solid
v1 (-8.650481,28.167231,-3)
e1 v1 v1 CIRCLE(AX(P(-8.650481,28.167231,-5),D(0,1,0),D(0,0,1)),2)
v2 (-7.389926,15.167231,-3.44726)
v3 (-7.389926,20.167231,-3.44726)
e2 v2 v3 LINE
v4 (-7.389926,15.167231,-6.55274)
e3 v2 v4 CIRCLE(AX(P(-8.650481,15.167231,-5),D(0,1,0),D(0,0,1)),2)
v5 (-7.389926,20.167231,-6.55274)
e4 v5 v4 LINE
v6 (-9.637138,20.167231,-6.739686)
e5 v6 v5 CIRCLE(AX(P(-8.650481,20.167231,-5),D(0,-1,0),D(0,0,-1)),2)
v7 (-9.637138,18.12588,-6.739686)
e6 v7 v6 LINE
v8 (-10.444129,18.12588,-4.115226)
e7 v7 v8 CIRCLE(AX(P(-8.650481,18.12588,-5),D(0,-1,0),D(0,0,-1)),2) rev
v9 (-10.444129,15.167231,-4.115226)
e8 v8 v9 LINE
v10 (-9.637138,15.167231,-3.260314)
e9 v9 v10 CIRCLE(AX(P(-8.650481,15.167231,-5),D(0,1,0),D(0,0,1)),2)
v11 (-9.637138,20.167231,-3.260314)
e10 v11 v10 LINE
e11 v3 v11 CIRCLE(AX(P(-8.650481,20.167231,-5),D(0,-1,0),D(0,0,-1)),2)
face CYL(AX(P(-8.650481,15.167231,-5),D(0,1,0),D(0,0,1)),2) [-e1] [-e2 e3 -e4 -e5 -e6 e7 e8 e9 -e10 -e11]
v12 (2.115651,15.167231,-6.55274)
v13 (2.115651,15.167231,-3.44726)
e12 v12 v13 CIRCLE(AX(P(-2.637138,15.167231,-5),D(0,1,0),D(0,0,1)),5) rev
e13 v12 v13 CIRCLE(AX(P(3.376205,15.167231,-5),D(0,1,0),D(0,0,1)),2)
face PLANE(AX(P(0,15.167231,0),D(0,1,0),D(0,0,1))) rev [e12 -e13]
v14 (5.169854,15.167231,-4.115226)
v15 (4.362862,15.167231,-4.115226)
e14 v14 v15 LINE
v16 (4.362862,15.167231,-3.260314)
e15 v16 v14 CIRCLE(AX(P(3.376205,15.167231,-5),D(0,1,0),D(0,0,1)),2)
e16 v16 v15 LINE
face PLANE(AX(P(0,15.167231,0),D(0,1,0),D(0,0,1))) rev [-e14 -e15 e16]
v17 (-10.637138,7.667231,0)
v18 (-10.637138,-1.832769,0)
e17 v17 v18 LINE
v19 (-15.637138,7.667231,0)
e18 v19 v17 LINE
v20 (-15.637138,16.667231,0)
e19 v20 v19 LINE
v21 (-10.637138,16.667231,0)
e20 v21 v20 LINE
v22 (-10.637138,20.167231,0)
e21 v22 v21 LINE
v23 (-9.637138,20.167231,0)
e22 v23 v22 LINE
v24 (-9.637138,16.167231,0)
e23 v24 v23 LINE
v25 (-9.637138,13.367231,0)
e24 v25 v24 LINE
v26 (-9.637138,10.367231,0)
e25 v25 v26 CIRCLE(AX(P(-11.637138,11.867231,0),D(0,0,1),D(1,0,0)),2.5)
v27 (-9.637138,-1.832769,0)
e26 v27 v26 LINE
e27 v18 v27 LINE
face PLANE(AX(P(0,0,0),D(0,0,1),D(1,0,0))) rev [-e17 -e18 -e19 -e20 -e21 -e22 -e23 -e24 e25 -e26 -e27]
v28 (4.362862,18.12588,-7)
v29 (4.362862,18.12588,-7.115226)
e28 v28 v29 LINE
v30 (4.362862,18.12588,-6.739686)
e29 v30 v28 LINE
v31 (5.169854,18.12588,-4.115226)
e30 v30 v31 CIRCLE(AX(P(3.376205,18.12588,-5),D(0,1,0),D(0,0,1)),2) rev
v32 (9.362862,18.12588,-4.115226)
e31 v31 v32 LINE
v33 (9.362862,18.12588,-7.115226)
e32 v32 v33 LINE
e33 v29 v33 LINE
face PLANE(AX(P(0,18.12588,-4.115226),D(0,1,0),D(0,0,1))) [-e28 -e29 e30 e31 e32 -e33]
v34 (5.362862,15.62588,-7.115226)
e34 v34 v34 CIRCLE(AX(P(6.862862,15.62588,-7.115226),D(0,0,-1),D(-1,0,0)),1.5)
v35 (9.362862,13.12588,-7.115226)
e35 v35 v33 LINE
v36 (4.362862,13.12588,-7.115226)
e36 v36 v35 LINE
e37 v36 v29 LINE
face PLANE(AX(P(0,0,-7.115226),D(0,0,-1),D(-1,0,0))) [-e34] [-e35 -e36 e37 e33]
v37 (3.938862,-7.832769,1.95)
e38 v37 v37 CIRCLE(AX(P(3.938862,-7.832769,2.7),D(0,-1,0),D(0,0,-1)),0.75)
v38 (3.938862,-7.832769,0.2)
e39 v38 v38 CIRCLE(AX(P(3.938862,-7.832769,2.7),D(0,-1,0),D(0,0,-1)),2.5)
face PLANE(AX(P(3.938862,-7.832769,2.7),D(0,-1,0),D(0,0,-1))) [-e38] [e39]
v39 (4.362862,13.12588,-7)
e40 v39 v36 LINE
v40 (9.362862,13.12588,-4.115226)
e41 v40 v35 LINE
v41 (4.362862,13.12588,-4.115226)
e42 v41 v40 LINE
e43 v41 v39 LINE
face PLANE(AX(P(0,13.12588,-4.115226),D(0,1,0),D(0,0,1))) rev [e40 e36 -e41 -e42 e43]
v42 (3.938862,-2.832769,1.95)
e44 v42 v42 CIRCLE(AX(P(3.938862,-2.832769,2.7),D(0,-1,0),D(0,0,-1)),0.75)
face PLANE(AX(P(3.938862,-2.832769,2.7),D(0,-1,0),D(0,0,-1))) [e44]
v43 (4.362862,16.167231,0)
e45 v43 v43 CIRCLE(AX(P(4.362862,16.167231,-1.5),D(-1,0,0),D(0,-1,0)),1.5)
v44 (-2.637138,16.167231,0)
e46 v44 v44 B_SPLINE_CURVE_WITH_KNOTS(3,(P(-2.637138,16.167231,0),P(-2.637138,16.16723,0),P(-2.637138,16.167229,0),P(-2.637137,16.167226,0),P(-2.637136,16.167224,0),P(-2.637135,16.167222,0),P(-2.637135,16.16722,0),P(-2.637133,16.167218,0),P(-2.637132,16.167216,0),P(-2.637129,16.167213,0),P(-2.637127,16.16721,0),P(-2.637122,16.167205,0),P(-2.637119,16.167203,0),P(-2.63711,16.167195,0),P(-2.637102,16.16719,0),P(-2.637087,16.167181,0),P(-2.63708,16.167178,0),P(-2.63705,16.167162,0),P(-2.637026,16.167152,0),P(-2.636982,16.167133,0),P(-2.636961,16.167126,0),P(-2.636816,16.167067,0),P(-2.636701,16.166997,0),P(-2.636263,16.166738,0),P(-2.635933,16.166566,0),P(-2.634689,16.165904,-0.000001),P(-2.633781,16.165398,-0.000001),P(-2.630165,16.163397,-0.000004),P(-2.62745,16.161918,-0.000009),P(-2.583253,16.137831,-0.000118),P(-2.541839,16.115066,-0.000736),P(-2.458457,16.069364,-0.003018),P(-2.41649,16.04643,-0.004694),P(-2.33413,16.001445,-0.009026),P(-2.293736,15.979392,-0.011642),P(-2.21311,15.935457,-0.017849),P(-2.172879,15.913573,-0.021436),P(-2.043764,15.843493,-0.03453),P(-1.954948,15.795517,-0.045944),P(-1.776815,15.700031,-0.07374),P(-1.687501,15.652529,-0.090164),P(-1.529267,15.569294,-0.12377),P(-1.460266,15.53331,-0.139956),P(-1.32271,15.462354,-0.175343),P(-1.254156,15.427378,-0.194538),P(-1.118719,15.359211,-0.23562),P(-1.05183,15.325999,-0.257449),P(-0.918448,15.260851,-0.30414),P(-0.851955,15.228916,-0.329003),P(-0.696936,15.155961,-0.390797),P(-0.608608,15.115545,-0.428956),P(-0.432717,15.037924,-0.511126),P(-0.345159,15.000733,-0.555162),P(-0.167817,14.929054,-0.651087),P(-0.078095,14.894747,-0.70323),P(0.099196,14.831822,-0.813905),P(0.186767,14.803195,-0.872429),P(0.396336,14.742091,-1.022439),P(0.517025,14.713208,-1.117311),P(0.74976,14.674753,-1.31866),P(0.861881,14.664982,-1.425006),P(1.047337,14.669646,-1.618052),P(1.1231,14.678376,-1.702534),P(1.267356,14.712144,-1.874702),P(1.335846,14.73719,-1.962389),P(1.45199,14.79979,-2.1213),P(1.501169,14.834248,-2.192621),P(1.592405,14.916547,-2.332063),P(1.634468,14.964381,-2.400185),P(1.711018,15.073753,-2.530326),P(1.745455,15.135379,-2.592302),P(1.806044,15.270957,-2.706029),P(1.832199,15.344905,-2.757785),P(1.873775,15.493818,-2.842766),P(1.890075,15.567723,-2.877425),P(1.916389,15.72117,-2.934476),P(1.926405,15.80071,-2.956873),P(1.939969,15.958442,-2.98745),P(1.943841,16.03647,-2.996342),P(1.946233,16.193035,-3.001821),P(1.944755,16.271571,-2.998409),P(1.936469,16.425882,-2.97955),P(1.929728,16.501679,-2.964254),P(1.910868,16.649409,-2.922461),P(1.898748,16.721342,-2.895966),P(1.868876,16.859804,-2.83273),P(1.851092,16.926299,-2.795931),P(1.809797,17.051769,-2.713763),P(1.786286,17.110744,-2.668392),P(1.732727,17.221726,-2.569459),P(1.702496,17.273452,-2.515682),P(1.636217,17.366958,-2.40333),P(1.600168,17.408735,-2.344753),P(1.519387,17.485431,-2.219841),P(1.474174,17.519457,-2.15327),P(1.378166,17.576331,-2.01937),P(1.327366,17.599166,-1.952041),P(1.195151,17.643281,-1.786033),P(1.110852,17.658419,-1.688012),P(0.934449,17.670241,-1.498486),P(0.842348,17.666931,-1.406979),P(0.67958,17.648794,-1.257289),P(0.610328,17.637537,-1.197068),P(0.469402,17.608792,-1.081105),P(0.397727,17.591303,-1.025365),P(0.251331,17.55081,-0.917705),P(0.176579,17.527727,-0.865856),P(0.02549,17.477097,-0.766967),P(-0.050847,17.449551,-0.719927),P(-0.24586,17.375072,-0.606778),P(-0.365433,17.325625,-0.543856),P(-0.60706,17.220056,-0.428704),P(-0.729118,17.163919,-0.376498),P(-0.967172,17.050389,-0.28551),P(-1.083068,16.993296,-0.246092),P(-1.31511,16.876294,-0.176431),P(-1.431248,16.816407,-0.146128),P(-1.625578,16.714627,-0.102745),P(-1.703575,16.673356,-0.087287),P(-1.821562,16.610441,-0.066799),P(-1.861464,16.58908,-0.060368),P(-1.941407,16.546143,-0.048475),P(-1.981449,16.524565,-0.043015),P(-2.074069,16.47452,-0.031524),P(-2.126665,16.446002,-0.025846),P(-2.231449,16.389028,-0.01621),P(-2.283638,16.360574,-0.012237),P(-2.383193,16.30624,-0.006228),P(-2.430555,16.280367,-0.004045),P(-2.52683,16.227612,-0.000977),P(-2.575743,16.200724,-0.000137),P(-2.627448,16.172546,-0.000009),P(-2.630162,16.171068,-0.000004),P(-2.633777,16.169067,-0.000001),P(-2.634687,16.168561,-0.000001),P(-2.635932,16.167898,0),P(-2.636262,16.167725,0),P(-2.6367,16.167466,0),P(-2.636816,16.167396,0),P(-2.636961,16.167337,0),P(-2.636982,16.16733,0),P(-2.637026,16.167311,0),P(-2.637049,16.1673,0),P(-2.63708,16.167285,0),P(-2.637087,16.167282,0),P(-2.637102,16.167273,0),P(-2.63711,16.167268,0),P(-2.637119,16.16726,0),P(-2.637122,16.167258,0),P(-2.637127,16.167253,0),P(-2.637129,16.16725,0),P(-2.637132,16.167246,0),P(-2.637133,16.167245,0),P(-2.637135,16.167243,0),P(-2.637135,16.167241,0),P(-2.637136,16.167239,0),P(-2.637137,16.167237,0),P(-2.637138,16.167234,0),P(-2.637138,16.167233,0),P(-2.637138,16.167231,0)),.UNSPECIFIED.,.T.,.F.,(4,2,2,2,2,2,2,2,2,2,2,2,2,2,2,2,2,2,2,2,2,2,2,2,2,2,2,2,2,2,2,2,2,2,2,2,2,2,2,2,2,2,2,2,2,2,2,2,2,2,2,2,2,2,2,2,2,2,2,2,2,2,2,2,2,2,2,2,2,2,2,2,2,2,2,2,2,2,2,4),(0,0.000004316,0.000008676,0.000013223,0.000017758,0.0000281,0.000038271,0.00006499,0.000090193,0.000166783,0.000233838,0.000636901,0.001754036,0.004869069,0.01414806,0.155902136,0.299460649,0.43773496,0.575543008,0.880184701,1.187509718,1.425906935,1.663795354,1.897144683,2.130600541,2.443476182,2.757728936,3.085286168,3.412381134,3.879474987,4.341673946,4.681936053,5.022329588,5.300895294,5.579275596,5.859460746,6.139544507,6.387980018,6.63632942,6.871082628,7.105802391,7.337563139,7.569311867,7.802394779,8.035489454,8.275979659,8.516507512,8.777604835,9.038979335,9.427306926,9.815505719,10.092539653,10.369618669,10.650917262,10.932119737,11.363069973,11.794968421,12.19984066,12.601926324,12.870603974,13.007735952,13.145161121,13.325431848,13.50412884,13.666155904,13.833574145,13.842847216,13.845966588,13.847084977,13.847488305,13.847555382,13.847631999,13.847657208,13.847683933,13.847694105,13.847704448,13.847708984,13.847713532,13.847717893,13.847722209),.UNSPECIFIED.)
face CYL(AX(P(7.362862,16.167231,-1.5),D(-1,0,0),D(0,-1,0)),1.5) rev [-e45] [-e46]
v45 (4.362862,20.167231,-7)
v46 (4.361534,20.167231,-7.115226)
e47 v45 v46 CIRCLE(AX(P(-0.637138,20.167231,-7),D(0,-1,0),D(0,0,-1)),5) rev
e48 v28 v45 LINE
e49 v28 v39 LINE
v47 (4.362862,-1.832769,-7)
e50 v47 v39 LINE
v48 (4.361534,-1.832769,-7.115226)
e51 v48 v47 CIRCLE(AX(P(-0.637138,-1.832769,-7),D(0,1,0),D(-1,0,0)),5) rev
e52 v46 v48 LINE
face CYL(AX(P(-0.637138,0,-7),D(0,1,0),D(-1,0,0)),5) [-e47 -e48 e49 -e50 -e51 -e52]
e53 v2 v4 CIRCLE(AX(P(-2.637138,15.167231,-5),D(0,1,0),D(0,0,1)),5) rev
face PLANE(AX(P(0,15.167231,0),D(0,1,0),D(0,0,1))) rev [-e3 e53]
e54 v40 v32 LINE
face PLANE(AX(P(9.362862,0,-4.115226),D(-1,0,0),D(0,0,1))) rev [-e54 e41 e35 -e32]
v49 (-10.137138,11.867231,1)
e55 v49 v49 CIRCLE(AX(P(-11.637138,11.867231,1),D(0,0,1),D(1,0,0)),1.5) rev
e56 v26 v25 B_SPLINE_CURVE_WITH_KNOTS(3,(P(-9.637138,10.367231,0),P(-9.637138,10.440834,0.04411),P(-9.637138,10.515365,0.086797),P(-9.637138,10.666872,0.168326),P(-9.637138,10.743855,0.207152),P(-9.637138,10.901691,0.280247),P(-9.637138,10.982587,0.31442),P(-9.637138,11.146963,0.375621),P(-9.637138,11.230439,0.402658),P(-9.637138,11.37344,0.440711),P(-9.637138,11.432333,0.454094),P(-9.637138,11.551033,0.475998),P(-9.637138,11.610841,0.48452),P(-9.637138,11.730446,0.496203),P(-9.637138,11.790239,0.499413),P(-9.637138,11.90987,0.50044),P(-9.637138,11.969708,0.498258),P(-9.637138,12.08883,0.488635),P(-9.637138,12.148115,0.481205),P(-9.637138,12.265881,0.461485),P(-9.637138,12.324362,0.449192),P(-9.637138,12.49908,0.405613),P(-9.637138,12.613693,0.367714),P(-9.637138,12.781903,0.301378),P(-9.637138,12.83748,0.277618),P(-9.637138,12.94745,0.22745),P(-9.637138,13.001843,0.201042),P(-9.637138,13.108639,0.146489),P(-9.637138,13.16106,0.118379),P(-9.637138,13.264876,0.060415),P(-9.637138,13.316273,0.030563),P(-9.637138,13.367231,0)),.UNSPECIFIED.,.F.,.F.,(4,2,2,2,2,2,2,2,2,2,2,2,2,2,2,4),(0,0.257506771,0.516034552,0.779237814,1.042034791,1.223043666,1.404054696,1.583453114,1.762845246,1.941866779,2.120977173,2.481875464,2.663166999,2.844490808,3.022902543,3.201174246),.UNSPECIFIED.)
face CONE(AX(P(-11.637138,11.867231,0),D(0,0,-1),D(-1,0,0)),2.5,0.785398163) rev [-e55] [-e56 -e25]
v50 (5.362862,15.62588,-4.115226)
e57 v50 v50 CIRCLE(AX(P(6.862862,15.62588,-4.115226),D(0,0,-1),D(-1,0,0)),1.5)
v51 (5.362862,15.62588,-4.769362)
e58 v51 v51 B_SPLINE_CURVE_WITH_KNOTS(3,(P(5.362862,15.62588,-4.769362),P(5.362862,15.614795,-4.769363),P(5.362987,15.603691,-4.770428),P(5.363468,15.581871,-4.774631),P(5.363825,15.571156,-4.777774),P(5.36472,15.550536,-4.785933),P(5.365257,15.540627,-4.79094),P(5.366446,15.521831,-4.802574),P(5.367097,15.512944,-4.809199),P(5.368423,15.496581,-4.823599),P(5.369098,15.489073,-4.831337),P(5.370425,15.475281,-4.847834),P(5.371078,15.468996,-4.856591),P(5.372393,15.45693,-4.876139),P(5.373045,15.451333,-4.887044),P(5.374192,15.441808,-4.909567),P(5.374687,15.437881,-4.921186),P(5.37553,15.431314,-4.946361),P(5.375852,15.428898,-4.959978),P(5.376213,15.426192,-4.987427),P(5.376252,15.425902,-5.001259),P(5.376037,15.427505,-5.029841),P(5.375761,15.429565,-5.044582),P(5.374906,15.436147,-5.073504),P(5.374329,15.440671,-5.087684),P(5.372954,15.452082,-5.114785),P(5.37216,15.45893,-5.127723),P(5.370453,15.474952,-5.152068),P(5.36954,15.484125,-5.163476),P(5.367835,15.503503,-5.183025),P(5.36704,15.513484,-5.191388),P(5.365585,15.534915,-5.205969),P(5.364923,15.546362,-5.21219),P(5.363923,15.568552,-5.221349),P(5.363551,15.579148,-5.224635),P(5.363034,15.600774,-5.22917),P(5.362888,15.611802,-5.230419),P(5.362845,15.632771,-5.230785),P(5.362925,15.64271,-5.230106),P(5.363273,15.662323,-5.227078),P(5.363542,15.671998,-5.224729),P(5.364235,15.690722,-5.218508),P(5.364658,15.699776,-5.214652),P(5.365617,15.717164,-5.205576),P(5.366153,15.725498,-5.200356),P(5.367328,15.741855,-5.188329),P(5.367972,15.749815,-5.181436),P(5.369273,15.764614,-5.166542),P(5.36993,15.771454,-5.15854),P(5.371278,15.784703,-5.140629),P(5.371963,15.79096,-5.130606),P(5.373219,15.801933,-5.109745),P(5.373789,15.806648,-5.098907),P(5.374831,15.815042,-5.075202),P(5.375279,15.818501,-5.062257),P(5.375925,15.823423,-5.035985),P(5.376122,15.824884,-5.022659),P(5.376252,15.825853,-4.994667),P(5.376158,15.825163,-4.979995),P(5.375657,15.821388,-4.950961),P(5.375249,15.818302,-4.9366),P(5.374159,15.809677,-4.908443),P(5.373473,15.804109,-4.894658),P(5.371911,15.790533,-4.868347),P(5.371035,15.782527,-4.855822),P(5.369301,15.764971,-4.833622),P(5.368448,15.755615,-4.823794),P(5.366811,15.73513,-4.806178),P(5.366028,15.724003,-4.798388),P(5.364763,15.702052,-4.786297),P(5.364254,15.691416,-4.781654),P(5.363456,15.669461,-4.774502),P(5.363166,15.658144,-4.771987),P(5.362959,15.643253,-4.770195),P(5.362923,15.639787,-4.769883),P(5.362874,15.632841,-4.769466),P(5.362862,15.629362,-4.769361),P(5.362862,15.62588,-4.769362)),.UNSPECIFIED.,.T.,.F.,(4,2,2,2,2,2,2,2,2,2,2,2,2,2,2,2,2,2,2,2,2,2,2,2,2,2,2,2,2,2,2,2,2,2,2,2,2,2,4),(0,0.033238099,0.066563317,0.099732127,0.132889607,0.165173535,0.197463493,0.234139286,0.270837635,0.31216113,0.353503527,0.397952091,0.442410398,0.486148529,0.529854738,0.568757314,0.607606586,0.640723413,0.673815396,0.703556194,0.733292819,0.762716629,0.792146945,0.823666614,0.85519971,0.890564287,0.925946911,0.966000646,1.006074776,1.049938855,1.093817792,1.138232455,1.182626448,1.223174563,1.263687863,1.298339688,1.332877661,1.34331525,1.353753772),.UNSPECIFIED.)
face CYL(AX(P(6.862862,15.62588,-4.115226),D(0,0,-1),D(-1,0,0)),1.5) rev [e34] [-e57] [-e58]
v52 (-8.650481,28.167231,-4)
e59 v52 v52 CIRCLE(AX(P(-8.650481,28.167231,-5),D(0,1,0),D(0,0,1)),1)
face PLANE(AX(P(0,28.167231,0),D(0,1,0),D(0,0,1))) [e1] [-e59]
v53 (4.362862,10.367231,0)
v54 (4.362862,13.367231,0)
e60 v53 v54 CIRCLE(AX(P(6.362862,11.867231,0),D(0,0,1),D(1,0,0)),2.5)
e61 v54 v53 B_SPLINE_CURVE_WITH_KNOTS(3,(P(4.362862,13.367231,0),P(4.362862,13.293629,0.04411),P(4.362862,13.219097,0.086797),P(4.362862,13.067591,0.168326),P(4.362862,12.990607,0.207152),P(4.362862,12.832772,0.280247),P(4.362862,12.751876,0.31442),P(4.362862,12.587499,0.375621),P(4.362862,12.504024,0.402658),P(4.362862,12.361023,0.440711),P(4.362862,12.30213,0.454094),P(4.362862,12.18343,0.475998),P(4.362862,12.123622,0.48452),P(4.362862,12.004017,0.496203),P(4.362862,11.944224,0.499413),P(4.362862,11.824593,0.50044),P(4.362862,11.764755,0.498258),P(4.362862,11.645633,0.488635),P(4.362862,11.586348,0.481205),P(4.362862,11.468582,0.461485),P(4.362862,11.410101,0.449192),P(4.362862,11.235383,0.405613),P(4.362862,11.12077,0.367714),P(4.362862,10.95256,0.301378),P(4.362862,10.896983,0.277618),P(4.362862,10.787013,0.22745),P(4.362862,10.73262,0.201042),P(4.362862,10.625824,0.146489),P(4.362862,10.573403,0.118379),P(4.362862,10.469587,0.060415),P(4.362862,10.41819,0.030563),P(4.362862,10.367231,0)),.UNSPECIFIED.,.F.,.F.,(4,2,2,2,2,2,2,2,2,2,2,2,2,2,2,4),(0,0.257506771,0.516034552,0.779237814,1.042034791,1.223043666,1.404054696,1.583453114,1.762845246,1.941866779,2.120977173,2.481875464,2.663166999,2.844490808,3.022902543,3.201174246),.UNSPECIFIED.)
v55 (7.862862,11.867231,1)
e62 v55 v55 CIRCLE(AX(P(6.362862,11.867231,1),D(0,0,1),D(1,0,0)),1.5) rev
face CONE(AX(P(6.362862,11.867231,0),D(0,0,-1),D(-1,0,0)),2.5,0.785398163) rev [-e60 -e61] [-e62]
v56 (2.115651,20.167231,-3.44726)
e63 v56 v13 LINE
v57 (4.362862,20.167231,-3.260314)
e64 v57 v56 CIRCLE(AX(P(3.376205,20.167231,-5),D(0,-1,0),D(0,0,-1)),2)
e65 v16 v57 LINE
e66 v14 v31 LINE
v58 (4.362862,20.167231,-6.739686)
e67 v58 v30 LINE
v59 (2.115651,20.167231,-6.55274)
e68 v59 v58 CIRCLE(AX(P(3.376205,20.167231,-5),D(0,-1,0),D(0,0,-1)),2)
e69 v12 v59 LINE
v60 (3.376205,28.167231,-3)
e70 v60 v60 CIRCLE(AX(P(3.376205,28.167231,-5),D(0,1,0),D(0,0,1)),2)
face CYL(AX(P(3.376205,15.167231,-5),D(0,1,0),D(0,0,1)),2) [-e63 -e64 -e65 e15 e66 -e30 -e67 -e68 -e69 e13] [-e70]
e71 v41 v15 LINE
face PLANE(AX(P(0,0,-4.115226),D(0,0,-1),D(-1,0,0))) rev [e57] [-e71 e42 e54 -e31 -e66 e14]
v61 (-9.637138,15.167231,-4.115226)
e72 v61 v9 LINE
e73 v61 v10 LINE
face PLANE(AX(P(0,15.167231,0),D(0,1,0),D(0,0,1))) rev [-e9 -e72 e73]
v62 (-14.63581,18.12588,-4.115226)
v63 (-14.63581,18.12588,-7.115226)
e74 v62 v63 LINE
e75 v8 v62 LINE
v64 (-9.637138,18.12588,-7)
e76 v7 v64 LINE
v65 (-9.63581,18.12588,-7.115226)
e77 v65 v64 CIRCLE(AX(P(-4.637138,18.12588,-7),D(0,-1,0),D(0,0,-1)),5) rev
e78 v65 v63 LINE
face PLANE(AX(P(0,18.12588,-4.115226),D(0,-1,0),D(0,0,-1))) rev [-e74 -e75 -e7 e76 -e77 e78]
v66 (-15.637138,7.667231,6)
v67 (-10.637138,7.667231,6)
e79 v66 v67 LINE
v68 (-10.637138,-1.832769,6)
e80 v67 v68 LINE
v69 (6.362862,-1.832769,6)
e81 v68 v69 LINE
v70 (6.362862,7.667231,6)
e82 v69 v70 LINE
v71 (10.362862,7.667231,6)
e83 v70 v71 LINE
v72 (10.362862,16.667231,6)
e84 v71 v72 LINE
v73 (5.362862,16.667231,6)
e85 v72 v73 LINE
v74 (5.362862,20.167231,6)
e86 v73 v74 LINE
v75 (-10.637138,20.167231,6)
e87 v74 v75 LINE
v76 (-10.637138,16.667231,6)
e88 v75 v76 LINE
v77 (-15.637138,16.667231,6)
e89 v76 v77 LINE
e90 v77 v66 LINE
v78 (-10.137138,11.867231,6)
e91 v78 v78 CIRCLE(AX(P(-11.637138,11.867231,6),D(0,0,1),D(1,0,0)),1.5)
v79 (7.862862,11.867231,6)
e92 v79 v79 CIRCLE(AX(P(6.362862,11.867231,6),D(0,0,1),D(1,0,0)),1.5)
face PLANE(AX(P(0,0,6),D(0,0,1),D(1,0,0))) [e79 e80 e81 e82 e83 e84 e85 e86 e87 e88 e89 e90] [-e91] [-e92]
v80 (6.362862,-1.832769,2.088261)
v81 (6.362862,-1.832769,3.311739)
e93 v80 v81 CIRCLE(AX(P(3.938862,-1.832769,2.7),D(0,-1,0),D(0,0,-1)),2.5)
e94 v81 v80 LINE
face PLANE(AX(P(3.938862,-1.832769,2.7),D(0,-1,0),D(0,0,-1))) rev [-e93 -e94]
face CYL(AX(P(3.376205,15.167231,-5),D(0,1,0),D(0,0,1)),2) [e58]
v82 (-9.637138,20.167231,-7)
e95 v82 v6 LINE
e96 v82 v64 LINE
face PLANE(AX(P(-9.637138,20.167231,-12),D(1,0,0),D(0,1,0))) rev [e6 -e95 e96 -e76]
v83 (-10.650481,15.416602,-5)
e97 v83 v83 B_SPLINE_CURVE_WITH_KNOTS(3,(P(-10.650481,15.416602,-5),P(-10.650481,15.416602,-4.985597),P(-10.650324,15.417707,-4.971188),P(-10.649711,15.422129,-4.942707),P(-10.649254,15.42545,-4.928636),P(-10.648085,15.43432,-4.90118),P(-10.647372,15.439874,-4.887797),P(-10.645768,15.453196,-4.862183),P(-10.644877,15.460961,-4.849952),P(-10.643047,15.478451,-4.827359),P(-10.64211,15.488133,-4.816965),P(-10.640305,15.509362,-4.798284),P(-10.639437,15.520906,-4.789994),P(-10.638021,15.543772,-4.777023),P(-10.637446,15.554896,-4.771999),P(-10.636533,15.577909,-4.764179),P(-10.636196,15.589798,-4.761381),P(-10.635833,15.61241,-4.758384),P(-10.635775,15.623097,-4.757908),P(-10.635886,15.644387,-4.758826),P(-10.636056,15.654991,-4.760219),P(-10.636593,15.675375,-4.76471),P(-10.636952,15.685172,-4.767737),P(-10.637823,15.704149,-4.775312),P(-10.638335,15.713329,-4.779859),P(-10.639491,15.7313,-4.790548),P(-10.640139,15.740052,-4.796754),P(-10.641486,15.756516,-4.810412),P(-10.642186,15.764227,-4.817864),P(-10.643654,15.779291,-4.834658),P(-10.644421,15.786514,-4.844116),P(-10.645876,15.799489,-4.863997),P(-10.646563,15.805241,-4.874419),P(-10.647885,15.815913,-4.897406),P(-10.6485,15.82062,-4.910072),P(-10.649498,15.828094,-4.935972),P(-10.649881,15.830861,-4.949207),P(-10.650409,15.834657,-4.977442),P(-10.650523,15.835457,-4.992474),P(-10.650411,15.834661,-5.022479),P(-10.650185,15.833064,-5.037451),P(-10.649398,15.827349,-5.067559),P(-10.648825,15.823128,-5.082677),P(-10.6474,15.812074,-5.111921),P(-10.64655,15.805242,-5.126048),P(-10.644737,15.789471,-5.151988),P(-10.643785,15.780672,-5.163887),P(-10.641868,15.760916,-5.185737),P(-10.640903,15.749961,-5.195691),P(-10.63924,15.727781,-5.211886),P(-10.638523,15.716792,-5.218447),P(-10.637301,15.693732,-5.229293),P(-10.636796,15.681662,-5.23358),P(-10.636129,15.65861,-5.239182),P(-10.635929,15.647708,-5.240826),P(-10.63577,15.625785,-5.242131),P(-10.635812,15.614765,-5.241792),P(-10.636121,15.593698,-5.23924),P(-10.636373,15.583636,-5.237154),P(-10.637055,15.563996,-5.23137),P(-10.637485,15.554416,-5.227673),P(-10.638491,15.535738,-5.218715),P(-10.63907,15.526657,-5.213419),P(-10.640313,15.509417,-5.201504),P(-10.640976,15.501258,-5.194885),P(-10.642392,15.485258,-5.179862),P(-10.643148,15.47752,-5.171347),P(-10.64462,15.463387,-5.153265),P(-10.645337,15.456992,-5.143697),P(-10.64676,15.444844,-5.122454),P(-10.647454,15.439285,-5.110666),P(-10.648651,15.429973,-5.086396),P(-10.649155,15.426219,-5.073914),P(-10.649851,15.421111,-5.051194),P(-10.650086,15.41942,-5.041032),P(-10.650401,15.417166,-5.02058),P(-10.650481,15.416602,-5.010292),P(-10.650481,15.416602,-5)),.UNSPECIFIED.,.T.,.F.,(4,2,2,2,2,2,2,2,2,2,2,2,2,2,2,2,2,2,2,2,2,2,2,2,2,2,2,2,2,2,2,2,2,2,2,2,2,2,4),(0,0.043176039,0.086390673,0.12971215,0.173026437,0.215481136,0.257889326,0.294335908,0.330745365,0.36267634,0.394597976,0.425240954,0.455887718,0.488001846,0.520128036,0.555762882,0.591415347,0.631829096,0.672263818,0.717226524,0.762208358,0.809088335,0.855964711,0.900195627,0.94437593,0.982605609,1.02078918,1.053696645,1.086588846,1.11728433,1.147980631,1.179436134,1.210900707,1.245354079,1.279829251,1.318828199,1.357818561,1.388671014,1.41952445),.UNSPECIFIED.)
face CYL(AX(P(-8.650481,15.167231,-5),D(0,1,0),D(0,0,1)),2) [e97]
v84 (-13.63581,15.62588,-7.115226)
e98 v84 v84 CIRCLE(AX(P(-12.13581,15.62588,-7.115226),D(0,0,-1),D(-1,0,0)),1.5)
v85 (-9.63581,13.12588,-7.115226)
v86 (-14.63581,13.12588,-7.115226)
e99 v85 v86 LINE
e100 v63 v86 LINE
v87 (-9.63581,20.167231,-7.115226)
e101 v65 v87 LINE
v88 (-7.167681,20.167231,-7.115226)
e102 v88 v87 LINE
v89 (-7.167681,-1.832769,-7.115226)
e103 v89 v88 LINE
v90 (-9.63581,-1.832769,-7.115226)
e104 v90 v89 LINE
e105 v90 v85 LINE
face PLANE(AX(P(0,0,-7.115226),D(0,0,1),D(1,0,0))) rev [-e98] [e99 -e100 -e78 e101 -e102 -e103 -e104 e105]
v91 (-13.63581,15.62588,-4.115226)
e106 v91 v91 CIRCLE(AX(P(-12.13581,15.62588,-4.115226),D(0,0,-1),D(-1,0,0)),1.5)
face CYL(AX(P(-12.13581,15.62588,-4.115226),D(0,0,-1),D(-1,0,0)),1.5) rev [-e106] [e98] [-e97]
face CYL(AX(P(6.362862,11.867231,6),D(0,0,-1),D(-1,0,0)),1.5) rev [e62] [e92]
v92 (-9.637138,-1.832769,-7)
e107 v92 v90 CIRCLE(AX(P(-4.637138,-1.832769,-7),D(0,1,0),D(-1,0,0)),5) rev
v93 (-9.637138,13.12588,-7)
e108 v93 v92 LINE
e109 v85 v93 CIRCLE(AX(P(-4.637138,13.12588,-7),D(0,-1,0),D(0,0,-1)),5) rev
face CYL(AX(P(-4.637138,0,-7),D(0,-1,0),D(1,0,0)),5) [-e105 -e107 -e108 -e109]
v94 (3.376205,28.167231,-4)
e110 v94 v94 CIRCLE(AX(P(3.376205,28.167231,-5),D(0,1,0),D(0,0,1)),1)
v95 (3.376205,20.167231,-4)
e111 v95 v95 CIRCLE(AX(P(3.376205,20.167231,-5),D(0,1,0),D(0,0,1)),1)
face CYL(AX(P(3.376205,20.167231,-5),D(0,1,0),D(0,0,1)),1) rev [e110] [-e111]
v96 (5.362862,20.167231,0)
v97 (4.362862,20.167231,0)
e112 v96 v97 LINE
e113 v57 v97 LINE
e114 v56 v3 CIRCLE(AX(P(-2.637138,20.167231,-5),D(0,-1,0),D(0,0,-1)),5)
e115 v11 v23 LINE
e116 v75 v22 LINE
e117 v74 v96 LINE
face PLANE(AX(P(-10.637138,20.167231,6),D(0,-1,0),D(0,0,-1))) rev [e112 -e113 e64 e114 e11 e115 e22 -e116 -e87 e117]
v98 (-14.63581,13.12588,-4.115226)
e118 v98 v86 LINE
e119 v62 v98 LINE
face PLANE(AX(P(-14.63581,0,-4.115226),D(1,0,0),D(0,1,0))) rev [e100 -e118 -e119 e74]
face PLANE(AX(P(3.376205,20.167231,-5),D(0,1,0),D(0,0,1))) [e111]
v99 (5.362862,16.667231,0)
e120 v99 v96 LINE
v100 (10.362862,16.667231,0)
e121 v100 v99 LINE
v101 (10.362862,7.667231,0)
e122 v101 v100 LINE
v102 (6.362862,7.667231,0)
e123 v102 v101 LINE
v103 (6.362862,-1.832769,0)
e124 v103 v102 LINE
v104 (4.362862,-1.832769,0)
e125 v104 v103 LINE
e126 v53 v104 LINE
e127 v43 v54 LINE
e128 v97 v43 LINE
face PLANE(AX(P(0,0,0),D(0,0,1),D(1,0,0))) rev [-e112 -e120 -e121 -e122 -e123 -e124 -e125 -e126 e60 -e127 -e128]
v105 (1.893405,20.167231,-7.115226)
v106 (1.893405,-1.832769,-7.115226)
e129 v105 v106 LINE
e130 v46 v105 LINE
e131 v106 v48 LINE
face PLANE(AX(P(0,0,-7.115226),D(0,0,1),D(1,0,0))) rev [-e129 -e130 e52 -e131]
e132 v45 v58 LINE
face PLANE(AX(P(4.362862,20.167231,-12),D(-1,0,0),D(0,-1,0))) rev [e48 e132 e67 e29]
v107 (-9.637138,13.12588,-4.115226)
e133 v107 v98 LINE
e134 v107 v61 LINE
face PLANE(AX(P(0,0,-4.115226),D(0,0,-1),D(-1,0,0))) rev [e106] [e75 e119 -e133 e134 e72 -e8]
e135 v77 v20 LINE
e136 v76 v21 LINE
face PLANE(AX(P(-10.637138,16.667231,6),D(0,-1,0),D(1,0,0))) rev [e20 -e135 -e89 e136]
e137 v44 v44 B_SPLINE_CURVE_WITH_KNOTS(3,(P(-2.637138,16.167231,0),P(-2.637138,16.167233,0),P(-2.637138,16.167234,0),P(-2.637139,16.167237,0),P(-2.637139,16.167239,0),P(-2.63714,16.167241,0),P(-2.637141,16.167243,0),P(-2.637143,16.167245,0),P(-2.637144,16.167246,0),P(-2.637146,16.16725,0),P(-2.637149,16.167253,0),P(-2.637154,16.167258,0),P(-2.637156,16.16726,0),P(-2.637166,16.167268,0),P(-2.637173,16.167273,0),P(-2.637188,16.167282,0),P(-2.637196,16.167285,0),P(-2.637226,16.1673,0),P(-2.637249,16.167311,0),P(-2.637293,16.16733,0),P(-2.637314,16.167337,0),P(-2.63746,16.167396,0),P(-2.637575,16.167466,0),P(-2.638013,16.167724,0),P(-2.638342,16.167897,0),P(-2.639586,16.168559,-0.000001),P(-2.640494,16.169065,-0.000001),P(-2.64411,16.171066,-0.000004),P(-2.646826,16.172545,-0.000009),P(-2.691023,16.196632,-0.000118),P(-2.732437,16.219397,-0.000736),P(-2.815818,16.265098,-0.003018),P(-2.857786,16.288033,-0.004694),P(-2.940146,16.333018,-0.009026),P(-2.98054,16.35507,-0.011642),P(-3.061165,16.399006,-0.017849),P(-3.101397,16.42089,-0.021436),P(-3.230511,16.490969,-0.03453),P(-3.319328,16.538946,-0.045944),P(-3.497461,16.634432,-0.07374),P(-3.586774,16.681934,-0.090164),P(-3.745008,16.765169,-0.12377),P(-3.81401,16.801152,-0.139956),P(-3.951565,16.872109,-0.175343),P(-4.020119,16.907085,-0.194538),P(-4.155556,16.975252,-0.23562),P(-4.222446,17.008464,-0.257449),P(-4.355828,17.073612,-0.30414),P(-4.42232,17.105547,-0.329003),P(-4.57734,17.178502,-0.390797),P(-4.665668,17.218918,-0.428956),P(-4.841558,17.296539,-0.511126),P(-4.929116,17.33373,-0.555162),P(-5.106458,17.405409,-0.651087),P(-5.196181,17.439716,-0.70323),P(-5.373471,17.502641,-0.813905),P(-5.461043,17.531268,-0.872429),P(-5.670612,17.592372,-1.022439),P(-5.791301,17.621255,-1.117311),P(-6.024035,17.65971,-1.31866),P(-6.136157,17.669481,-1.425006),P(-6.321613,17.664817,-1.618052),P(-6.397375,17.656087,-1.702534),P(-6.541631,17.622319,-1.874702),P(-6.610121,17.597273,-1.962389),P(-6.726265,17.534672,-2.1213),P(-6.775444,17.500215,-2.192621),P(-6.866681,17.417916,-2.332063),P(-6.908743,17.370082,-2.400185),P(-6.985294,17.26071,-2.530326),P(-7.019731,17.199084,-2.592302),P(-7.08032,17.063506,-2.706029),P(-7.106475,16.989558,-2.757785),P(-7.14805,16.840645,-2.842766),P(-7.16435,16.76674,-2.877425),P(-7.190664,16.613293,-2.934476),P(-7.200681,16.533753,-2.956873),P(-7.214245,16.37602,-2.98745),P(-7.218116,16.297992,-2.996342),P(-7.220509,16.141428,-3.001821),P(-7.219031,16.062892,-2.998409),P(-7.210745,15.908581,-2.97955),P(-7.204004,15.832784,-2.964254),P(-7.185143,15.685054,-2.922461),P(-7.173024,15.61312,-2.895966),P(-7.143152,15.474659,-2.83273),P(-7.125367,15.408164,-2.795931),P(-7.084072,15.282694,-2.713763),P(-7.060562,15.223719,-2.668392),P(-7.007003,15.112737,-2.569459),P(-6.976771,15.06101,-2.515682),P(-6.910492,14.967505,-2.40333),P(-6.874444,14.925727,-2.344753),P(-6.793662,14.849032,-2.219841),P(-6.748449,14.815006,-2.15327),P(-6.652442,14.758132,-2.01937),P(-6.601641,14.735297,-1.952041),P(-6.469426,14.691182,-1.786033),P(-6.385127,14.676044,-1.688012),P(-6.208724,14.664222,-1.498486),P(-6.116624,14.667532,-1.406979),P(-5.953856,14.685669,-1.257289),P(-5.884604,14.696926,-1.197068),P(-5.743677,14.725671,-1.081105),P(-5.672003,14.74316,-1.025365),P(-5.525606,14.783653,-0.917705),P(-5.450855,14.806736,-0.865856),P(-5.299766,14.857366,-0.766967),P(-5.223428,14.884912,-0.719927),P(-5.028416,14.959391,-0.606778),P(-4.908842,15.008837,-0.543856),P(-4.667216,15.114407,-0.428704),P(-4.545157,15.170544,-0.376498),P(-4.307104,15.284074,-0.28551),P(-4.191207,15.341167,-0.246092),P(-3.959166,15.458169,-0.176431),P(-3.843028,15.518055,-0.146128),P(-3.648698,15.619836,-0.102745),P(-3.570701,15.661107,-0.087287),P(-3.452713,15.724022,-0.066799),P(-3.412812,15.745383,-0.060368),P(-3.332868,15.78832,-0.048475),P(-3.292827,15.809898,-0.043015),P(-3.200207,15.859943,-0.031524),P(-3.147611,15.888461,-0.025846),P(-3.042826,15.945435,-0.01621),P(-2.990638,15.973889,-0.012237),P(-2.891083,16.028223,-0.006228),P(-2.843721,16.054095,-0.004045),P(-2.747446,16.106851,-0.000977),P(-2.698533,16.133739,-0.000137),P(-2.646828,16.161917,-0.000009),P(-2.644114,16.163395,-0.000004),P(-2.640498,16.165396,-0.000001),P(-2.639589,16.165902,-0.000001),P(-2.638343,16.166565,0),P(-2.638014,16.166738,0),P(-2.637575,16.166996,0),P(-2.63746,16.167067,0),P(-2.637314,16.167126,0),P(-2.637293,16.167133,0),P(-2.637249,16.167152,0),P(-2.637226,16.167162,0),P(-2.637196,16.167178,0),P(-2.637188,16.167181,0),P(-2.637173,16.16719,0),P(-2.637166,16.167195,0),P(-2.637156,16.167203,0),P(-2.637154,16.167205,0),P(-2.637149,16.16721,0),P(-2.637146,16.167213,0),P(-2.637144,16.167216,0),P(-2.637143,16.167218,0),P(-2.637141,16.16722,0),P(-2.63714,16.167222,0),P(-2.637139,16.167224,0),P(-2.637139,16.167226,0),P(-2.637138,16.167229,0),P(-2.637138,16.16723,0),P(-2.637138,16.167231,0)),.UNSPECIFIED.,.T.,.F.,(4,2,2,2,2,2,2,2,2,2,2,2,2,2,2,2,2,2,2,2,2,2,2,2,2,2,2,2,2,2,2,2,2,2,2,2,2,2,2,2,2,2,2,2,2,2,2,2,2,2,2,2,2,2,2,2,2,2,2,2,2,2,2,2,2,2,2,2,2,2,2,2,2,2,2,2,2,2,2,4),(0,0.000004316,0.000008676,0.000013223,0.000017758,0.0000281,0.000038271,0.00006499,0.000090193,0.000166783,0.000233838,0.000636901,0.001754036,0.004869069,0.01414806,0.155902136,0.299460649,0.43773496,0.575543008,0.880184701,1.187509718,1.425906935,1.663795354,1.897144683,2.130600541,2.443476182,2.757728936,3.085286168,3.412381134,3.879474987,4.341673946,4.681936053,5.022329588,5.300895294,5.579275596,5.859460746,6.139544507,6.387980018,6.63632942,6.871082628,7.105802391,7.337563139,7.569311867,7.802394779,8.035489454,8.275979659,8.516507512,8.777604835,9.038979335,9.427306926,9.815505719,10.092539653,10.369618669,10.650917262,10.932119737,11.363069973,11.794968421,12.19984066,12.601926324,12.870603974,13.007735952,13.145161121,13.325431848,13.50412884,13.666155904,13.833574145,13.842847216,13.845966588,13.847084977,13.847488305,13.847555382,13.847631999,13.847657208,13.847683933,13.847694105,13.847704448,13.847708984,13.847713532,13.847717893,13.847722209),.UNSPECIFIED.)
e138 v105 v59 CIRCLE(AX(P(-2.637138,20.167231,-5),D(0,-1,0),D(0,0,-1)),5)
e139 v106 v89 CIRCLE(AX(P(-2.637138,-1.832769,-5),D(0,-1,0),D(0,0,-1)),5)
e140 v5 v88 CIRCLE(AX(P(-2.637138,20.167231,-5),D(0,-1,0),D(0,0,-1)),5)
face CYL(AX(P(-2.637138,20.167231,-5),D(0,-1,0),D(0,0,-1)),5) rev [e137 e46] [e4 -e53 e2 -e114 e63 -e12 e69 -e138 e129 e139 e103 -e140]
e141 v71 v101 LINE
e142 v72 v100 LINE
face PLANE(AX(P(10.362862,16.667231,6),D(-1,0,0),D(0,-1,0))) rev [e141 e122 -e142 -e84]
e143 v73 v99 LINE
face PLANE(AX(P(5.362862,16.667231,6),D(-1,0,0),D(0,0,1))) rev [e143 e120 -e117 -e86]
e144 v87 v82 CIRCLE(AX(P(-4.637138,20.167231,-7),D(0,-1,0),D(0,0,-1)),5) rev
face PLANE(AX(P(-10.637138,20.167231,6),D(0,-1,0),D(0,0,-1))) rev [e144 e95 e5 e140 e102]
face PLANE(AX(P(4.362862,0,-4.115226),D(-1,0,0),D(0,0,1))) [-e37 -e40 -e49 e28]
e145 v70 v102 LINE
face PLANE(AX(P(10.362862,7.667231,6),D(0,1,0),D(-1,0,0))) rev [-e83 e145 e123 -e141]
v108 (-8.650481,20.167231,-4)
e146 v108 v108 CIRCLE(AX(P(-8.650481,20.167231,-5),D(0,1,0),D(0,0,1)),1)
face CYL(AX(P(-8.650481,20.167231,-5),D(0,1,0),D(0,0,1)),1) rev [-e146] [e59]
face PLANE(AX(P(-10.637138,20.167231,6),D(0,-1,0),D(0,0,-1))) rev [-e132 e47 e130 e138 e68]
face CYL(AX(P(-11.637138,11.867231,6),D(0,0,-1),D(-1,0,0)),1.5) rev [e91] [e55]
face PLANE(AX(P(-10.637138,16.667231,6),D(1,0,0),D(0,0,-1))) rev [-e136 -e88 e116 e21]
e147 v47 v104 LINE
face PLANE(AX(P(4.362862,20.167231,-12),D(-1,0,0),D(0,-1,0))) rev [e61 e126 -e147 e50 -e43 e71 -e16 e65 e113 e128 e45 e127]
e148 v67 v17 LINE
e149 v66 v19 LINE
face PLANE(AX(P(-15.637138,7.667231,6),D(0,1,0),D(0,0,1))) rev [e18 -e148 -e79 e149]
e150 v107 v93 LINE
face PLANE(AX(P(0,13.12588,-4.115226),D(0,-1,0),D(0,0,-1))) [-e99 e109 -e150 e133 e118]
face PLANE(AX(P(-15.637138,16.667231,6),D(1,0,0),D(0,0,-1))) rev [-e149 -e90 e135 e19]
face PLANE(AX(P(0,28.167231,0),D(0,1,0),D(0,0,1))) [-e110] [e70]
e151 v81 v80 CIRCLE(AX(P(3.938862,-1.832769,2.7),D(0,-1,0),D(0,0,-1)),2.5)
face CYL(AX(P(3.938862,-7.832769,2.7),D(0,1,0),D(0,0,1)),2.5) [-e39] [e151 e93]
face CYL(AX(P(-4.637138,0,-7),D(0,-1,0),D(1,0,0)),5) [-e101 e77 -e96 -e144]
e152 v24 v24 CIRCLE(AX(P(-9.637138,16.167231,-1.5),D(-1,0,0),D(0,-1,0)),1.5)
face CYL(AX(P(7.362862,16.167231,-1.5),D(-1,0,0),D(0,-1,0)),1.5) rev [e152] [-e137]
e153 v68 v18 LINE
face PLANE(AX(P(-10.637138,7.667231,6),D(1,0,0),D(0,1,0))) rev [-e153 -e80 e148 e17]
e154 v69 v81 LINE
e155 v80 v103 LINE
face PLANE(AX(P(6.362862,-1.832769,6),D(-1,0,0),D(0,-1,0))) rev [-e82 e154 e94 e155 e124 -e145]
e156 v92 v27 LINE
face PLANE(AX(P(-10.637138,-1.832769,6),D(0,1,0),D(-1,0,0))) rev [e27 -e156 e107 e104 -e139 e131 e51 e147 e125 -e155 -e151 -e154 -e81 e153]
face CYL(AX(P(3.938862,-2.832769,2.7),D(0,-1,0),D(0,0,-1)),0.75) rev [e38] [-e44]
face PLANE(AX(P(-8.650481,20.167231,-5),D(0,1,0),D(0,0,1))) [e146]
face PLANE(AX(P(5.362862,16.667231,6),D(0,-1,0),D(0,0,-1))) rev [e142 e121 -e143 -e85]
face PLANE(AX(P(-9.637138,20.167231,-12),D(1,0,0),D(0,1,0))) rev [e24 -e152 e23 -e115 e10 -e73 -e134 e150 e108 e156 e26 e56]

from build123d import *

# Parameters (mm, degrees)
ESBO_O1_R                      = 1.5
RESSALTO_EXTRUS_O1_DEPTH       = 6
ESBO_O6_W                      = 14
ESBO_O6_H                      = 22
RESSALTO_EXTRUS_O3_DEPTH       = 12
ESBO_O7_R                      = 5
CORTE_EXTRUS_O4_DEPTH          = 30.538450843
FILETE3_R                      = 5
ESBO_O11_R                     = 2.5
RESSALTO_EXTRUS_O11_DEPTH      = 6
RESSALTO_EXTRUS_O13_DEPTH      = 8
RESSALTO_EXTRUS_O13_DEPTH_BACK = 5
ESBO_O15_R                     = 2
ESBO_O17_R                     = 1
CORTE_EXTRUS_O6_DEPTH          = 8
ESBO_O20_R                     = 0.75
CORTE_EXTRUS_O7_DEPTH          = 5
ESBO_O21_W                     = 22.669500521
ESBO_O21_H                     = 31.157259519
CORTE_EXTRUS_O8_DEPTH          = 6
ESBO_O22_W                     = 5
ESBO_O22_H                     = 5
ESBO_O22_R                     = 1.5
RESSALTO_EXTRUS_O15_DEPTH      = 3
CHANFRO5_SIZE                  = 1
ESBO_O23_R                     = 1.5
CORTE_EXTRUS_O9_DEPTH          = 17


with BuildPart() as part:
    # Esboço1 → Ressalto-extrusão1 (new body)
    with BuildSketch(Plane.XY):
        Polygon((-10.637137788, -1.832768542), (6.362862212, -1.832768542), (6.362862212, 7.667231458), (10.362862212, 7.667231458), (10.362862212, 16.667231458), (5.362862212, 16.667231458), (5.362862212, 20.167231458), (-10.637137788, 20.167231458), (-10.637137788, 16.667231458), (-15.637137788, 16.667231458), (-15.637137788, 7.667231458), (-10.637137788, 7.667231458), align=None)
        with Locations((6.362862212, 11.867231458)):
            Circle(ESBO_O1_R, mode=Mode.SUBTRACT)
        with Locations((-11.637137788, 11.867231458)):
            Circle(ESBO_O1_R, mode=Mode.SUBTRACT)
    extrude(amount=RESSALTO_EXTRUS_O1_DEPTH)

    # Esboço6 → Ressalto-extrusão3 (add)
    with BuildSketch(Plane(origin=(0, 0, 0), x_dir=(-1, 0, 0), z_dir=(0, 0, -1))):
        with Locations((2.637137788, 9.167231458)):
            Rectangle(ESBO_O6_W, ESBO_O6_H)
    extrude(amount=RESSALTO_EXTRUS_O3_DEPTH)

    # Esboço7 → Corte-extrusão4 (cut, through all)
    with BuildSketch(Plane.XZ.offset(1.832768542)):
        with Locations(Location((-2.637137788, -5, 0), (0, 0, 270))):
            Circle(ESBO_O7_R)
    extrude(amount=-CORTE_EXTRUS_O4_DEPTH, mode=Mode.SUBTRACT)

    # Filete3
    filete3_edges = [part.edges().sort_by_distance(p)[0] for p in [
        (4.362862212, 9.167231458, -12),
        (-9.637137788, 9.167231458, -12),
    ]]
    fillet(filete3_edges, radius=FILETE3_R)

    # Esboço11 → Ressalto-extrusão11 (add)
    with BuildSketch(Plane.XZ.offset(1.832768542)):
        with Locations(Location((3.938862212, 2.7, 0), (0, 0, 14.163833683))):
            Circle(ESBO_O11_R)
    extrude(amount=RESSALTO_EXTRUS_O11_DEPTH)

    # Esboço15 → Ressalto-extrusão13 (add, two sides: drawn at the far end of the back side and taken through both)
    with BuildSketch(Plane(origin=(0, 20.167231458, 0), x_dir=(1, 0, 0), z_dir=(0, 1, 0)).offset(-RESSALTO_EXTRUS_O13_DEPTH_BACK)):
        with Locations(Location((-8.650480796, 5, 0), (0, 0, 270))):
            Circle(ESBO_O15_R)
        with Locations(Location((3.376205221, 5, 0), (0, 0, 270))):
            Circle(ESBO_O15_R)
    extrude(amount=RESSALTO_EXTRUS_O13_DEPTH + RESSALTO_EXTRUS_O13_DEPTH_BACK)

    # Esboço17 → Corte-extrusão6 (cut)
    with BuildSketch(Plane(origin=(0, 28.167231458, 0), x_dir=(1, 0, 0), z_dir=(0, 1, 0))):
        with Locations(Location((-8.650480796, 5, 0), (0, 0, 270))):
            Circle(ESBO_O17_R)
        with Locations(Location((3.376205221, 5, 0), (0, 0, 270))):
            Circle(ESBO_O17_R)
    extrude(amount=-CORTE_EXTRUS_O6_DEPTH, mode=Mode.SUBTRACT)

    # Esboço20 → Corte-extrusão7 (cut)
    with BuildSketch(Plane.XZ.offset(7.832768542)):
        with Locations(Location((3.938862212, 2.7, 0), (0, 0, 270))):
            Circle(ESBO_O20_R)
    extrude(amount=-CORTE_EXTRUS_O7_DEPTH, mode=Mode.SUBTRACT)

    # Esboço21 → Corte-extrusão8 (cut)
    with BuildSketch(Plane(origin=(0, 0, -7.115225733), x_dir=(1, 0, 0), z_dir=(0, 0, -1))):
        with Locations((-2.778124877, -9.864448806)):
            Rectangle(ESBO_O21_W, ESBO_O21_H)
    extrude(amount=CORTE_EXTRUS_O8_DEPTH, mode=Mode.SUBTRACT)

    # Esboço22 → Ressalto-extrusão15 (add)
    # profile 1 of 2: a face of its own
    with BuildSketch(Plane(origin=(0, 0, -7.115225733), x_dir=(1, 0, 0), z_dir=(0, 0, -1))):
        with Locations((-12.135809914, -15.625880271)):
            Rectangle(ESBO_O22_W, ESBO_O22_H)
        with Locations(Location((-12.135809914, -15.625880271, 0), (0, 0, 180))):
            Circle(ESBO_O22_R, mode=Mode.SUBTRACT)
    # profile 2 of 2: a face of its own
    with BuildSketch(Plane(origin=(0, 0, -7.115225733), x_dir=(1, 0, 0), z_dir=(0, 0, -1))):
        with Locations((6.862862212, -15.625880271)):
            Rectangle(ESBO_O22_W, ESBO_O22_H)
        with Locations(Location((6.862862212, -15.625880271, 0), (0, 0, 180))):
            Circle(ESBO_O22_R, mode=Mode.SUBTRACT)
    extrude(amount=-RESSALTO_EXTRUS_O15_DEPTH)

    # Chanfro5
    # the kernel refuses this chamfer: 1 mm, written as the material it takes off along each edge
    with BuildSketch(Plane(origin=(6.362862212, 11.867231458, 0), x_dir=(1, 0, 0), z_dir=(0, -1, 0))) as chanfro5_piece_1_section:
        Polygon((1.5 + CHANFRO5_SIZE, 0), (1.5, CHANFRO5_SIZE), (1.5, 0), align=None)
    chanfro5_piece_1 = revolve(axis=Axis((6.362862212, 11.867231458, 0), (0, 0, 1)), mode=Mode.PRIVATE)
    chanfro5_piece_1 = split(chanfro5_piece_1, bisect_by=Plane(origin=(4.362862212, 13.893105183, 0.134898453), z_dir=(1, 0, 0)), keep=Keep.TOP, mode=Mode.PRIVATE)
    add(chanfro5_piece_1, mode=Mode.SUBTRACT)
    with BuildSketch(Plane(origin=(-11.637137788, 11.867231458, 0), x_dir=(1, 0, 0), z_dir=(0, -1, 0))) as chanfro5_piece_2_section:
        Polygon((1.5 + CHANFRO5_SIZE, 0), (1.5, CHANFRO5_SIZE), (1.5, 0), align=None)
    chanfro5_piece_2 = revolve(axis=Axis((-11.637137788, 11.867231458, 0), (0, 0, 1)), mode=Mode.PRIVATE)
    chanfro5_piece_2 = split(chanfro5_piece_2, bisect_by=Plane(origin=(-9.637137788, 11.867231458, 0.487087965), z_dir=(-1, 0, 0)), keep=Keep.TOP, mode=Mode.PRIVATE)
    add(chanfro5_piece_2, mode=Mode.SUBTRACT)

    # Esboço23 → Corte-extrusão9 (cut)
    with BuildSketch(Plane.ZY.offset(9.637137788)):
        with Locations((-1.5, 16.167231458)):
            Circle(ESBO_O23_R)
    extrude(amount=-CORTE_EXTRUS_O9_DEPTH, mode=Mode.SUBTRACT)


solid = part.part
